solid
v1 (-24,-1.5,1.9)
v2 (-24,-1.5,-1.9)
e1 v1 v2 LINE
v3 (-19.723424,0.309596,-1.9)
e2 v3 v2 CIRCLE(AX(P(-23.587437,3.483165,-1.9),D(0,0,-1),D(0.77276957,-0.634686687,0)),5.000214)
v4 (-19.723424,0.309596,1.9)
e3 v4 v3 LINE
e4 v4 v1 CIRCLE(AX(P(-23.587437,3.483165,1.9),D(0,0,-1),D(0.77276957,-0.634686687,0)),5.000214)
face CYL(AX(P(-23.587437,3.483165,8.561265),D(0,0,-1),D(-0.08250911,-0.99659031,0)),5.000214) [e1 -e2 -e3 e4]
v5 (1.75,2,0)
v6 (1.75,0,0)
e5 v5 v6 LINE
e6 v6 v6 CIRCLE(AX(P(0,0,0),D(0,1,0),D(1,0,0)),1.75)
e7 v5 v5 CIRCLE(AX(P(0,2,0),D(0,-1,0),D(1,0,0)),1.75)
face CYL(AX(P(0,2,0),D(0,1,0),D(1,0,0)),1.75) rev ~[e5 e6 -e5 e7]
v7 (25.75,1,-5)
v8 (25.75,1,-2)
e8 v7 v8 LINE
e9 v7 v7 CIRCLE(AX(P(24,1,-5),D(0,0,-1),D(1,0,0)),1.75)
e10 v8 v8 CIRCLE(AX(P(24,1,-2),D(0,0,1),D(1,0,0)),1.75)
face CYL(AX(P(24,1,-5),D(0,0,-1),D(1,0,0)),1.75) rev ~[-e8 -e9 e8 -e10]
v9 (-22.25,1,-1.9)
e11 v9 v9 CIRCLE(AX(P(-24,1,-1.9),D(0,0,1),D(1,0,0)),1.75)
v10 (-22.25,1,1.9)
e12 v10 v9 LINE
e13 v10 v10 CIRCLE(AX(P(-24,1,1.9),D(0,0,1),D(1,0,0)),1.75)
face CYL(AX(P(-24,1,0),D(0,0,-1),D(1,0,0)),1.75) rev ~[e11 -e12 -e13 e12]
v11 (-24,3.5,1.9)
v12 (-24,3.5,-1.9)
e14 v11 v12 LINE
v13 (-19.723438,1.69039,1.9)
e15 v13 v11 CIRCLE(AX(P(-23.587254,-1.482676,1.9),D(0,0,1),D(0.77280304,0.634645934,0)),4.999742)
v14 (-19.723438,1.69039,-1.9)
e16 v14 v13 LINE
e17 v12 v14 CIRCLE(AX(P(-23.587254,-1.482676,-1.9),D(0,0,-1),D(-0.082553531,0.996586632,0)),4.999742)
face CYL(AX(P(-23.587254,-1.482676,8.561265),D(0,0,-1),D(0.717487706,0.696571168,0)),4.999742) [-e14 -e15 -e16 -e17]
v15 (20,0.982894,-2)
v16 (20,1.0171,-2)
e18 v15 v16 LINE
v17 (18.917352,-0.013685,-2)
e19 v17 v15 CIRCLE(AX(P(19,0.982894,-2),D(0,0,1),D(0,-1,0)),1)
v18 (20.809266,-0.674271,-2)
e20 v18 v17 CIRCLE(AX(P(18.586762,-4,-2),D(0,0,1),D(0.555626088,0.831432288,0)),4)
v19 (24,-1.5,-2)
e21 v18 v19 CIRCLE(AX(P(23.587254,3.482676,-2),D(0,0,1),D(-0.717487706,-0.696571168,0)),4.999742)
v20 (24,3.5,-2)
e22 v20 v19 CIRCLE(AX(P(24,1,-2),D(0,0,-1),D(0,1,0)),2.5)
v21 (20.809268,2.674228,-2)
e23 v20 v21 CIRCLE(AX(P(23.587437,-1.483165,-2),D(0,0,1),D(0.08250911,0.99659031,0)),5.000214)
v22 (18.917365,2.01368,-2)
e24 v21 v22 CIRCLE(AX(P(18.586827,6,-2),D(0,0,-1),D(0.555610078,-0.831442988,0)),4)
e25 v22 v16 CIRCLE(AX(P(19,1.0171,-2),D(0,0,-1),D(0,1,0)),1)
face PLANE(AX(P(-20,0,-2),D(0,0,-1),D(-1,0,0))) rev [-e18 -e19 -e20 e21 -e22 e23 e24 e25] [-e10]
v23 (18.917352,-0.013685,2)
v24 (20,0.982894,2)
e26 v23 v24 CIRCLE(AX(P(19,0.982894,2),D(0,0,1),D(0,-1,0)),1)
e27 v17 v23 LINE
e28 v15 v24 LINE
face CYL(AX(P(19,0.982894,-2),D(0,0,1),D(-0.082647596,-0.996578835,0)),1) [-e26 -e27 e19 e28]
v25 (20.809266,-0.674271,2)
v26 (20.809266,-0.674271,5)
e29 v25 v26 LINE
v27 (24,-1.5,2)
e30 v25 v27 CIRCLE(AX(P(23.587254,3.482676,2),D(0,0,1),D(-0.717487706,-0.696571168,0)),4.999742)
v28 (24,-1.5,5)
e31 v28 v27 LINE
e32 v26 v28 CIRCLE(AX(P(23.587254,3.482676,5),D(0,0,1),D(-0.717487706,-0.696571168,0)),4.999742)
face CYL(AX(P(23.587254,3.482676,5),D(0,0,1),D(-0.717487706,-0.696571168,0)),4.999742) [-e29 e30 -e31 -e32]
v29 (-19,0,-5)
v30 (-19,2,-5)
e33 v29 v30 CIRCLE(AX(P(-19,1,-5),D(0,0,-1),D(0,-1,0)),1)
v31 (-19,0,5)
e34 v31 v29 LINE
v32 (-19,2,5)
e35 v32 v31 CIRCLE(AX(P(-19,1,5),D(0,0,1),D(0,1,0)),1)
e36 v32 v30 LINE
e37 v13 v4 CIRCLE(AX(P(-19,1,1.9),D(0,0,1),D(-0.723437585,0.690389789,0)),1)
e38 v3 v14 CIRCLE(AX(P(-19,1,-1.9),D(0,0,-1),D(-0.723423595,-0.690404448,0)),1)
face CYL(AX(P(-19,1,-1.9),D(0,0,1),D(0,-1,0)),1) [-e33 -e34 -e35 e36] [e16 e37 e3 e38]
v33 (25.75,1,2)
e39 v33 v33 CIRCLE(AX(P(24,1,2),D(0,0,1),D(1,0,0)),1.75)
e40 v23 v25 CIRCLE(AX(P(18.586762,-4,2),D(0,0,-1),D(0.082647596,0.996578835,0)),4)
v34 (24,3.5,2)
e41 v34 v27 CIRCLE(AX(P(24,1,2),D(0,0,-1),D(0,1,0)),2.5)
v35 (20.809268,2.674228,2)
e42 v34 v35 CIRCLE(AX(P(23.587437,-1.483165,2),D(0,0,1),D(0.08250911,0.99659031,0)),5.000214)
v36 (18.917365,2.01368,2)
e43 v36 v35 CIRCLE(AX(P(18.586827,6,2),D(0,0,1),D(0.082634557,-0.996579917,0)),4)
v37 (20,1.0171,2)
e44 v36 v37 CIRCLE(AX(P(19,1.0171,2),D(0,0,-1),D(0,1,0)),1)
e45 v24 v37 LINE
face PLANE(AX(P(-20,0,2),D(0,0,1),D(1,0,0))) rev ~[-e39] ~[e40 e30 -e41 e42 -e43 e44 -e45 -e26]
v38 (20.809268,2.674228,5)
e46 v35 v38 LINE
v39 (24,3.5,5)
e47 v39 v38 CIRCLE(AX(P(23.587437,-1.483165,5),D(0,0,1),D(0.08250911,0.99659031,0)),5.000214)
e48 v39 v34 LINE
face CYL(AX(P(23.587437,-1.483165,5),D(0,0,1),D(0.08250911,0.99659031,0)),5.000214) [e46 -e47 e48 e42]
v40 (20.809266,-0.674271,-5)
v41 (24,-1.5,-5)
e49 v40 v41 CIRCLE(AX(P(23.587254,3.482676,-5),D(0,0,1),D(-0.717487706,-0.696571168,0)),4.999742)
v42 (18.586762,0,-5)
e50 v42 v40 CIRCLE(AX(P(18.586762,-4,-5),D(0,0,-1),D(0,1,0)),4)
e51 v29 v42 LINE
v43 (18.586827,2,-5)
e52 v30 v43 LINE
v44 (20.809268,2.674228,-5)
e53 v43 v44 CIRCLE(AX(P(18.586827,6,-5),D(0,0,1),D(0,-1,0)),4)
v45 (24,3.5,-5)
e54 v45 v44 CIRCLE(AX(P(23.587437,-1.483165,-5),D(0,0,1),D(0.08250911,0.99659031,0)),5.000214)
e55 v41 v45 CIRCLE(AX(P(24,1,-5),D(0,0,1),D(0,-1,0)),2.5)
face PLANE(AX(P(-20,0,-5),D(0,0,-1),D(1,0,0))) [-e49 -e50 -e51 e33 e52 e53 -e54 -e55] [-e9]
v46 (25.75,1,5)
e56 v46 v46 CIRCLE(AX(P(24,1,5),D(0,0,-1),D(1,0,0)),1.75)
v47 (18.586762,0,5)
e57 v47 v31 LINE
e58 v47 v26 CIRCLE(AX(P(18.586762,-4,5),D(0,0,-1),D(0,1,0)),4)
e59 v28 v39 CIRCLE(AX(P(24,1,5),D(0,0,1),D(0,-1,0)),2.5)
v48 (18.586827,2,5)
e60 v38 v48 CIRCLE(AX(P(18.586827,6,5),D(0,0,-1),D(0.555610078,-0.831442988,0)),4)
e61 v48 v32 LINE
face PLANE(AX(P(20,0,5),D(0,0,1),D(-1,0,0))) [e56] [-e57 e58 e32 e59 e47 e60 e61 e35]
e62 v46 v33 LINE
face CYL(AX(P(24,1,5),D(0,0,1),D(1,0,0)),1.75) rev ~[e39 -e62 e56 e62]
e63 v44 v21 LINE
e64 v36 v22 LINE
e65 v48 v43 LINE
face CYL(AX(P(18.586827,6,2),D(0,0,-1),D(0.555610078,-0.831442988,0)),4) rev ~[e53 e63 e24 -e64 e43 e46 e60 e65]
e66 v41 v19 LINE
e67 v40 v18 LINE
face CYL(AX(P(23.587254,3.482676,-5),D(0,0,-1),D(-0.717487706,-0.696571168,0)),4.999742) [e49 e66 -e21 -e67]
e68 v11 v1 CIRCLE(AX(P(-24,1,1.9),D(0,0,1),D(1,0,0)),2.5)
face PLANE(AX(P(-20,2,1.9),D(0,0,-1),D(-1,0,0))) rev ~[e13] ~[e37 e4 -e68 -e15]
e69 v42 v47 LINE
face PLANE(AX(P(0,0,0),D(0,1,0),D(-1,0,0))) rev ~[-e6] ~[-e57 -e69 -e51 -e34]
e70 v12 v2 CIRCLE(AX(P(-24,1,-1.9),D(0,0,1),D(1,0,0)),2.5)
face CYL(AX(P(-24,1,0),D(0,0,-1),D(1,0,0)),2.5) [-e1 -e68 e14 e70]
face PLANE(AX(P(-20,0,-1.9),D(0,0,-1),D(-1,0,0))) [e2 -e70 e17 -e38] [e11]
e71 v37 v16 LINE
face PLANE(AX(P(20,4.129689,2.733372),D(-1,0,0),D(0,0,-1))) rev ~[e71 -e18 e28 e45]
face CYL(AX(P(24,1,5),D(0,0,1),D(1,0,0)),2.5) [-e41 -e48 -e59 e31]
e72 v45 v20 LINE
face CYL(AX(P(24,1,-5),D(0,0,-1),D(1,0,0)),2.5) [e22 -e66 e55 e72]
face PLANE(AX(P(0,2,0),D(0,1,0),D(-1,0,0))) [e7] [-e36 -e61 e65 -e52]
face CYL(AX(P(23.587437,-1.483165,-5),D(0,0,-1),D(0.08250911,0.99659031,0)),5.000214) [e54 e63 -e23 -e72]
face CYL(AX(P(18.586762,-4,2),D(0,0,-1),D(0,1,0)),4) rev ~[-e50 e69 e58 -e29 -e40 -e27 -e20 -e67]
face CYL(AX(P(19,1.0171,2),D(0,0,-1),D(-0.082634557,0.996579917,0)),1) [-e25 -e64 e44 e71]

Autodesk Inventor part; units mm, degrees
ref_plane "YZ Plane" through (0, 0, 0) normal (1, 0, 0) x (0, 1, 0)
ref_plane "XZ Plane" through (0, 0, 0) normal (0, 1, 0) x (-1, 0, 0)
sketch "Szkic1" plane through (0, 0, 0) normal (0, 1, 0) x (-1, 0, 0)
  line L0 (-20, 5) -> (20, 5)
  line L1 (20, 5) -> (20, -5)
  line L2 (20, -5) -> (-20, -5)
  line L3 (-20, -5) -> (-20, 5)
  line L4 (-20, 5) -> (20, -5) construction
  line L5 (20, 5) -> (-20, -5) construction
  point P0 (0, 0)
  dimension "d0" = 40
  dimension "d1" = 10
extrude "Wyciągnięcie proste1" add sketch "Szkic1" along normal blind 2
sketch "Szkic2" plane through (-20, 0, 5) normal (0, 0, 1) x (1, 0, 0)
  line L0 (40, 0) -> (40, 2)
  line L1 (40, 1) -> (44, 1)
  line L2 (40, 1) -> (44, 1) construction
  circle A0 centre (44, 1) radius 1.75
  circle A1 centre (44, 1) radius 2.5
  line L3 (44, 3.5) -> (44, 3.5)
  line L4 (44, -1.5) -> (44, -1.5)
  arc A2 (44, 3.5) -> (40, 2) centre (43.5874, -1.4829) ccw
  arc A3 (40, 0) -> (44, -1.5) centre (43.5874, 3.4829) ccw
  line L5 (40, 2) -> (0, 2) projected
  line L6 (40, 0) -> (40, 2) projected
  line L7 (40, 2) -> (40, 0)
  line L8 (40, 2) -> (40, 0)
  line L9 (40, 1) -> (41.9498, 1)
  point P0 (20, 0)
  point P1 (44, 3.5)
  dimension "d4" = 4
  dimension "d5" = 0
  dimension "d6" = 3.5
  dimension "d7" = 5
  dimension "d8" = 0
  dimension "d9" = 0
  dimension "d10" = 5
  dimension "d11" = 5
extrude "Wyciągnięcie proste2" add sketch "Szkic2" against normal blind 3
ref_plane "Płaszczyzna konstrukcyjna1" through (-20, 0, 0) normal (0, 0, 1) x (1, 0, 0)
mirror "Odbij1" about plane through (-20, 0, 0) normal (0, 0, 1) of "Wyciągnięcie proste2"
sketch "Szkic3" plane through (-20, 0, 0) normal (0, 0, 1) x (1, 0, 0)
  line L0 (0, 0) -> (0, 2) projected
  line L1 (0, 2) -> (0, 0)
  line L2 (0, 2) -> (0, 0)
  line L3 (0, 1) -> (-4, 1)
  line L4 (0, 1) -> (-4, 1) construction
  circle A0 centre (-4, 1) radius 1.75
  circle A1 centre (-4, 1) radius 2.5
  line L5 (-4, -1.5) -> (-4, -1.5)
  line L6 (-4, 3.5) -> (-4, 3.5)
  arc A2 (-4, -1.5) -> (0, 0) centre (-3.5874, 3.4829) ccw
  arc A3 (0, 2) -> (-4, 3.5) centre (-3.5874, -1.4829) ccw
  line L7 (0, 1) -> (-2.4782, 1)
  point P0 (20, 0)
  point P1 (-4, -1.5)
  point P2 (-4, 3.5)
  dimension "d16" = 4
  dimension "d17" = 0
  dimension "d18" = 3.5
  dimension "d19" = 5
  dimension "d20" = 0
  dimension "d21" = 0
  dimension "d22" = 5
  dimension "d23" = 5
extrude "Wyciągnięcie proste3" add sketch "Szkic3" along normal mid plane 3.8
fillet "Zaokrąglenie1" radius 4 4 edges at (20, 2, -3.5) (20, 2, 3.5) (20, 0, -3.5) (20, 0, 3.5)
fillet "Zaokrąglenie2" radius 1 2 edges at (20, 2.258, 0) (20, -0.258, 0)
fillet "Zaokrąglenie3" radius 1 4 edges at (-20, 0, 3.45) (-20, 2, 3.45) (-20, 0, -3.45) (-20, 2, -3.45)
sketch "Szkic4" plane through (0, 2, 0) normal (0, 1, 0) x (1, 0, 0)
  line L0 (-19, 5) -> (-19, -5) projected
  line L1 (-19, 0) -> (18.5868, 0)
  line L2 (18.5868, 5) -> (18.5868, -5) projected
  circle A0 centre (0, 0) radius 1.75
  dimension "d29" = 3.5
extrude "Wyciągnięcie proste4" cut sketch "Szkic4" against normal blind 10
properties part number "lamp_link"
